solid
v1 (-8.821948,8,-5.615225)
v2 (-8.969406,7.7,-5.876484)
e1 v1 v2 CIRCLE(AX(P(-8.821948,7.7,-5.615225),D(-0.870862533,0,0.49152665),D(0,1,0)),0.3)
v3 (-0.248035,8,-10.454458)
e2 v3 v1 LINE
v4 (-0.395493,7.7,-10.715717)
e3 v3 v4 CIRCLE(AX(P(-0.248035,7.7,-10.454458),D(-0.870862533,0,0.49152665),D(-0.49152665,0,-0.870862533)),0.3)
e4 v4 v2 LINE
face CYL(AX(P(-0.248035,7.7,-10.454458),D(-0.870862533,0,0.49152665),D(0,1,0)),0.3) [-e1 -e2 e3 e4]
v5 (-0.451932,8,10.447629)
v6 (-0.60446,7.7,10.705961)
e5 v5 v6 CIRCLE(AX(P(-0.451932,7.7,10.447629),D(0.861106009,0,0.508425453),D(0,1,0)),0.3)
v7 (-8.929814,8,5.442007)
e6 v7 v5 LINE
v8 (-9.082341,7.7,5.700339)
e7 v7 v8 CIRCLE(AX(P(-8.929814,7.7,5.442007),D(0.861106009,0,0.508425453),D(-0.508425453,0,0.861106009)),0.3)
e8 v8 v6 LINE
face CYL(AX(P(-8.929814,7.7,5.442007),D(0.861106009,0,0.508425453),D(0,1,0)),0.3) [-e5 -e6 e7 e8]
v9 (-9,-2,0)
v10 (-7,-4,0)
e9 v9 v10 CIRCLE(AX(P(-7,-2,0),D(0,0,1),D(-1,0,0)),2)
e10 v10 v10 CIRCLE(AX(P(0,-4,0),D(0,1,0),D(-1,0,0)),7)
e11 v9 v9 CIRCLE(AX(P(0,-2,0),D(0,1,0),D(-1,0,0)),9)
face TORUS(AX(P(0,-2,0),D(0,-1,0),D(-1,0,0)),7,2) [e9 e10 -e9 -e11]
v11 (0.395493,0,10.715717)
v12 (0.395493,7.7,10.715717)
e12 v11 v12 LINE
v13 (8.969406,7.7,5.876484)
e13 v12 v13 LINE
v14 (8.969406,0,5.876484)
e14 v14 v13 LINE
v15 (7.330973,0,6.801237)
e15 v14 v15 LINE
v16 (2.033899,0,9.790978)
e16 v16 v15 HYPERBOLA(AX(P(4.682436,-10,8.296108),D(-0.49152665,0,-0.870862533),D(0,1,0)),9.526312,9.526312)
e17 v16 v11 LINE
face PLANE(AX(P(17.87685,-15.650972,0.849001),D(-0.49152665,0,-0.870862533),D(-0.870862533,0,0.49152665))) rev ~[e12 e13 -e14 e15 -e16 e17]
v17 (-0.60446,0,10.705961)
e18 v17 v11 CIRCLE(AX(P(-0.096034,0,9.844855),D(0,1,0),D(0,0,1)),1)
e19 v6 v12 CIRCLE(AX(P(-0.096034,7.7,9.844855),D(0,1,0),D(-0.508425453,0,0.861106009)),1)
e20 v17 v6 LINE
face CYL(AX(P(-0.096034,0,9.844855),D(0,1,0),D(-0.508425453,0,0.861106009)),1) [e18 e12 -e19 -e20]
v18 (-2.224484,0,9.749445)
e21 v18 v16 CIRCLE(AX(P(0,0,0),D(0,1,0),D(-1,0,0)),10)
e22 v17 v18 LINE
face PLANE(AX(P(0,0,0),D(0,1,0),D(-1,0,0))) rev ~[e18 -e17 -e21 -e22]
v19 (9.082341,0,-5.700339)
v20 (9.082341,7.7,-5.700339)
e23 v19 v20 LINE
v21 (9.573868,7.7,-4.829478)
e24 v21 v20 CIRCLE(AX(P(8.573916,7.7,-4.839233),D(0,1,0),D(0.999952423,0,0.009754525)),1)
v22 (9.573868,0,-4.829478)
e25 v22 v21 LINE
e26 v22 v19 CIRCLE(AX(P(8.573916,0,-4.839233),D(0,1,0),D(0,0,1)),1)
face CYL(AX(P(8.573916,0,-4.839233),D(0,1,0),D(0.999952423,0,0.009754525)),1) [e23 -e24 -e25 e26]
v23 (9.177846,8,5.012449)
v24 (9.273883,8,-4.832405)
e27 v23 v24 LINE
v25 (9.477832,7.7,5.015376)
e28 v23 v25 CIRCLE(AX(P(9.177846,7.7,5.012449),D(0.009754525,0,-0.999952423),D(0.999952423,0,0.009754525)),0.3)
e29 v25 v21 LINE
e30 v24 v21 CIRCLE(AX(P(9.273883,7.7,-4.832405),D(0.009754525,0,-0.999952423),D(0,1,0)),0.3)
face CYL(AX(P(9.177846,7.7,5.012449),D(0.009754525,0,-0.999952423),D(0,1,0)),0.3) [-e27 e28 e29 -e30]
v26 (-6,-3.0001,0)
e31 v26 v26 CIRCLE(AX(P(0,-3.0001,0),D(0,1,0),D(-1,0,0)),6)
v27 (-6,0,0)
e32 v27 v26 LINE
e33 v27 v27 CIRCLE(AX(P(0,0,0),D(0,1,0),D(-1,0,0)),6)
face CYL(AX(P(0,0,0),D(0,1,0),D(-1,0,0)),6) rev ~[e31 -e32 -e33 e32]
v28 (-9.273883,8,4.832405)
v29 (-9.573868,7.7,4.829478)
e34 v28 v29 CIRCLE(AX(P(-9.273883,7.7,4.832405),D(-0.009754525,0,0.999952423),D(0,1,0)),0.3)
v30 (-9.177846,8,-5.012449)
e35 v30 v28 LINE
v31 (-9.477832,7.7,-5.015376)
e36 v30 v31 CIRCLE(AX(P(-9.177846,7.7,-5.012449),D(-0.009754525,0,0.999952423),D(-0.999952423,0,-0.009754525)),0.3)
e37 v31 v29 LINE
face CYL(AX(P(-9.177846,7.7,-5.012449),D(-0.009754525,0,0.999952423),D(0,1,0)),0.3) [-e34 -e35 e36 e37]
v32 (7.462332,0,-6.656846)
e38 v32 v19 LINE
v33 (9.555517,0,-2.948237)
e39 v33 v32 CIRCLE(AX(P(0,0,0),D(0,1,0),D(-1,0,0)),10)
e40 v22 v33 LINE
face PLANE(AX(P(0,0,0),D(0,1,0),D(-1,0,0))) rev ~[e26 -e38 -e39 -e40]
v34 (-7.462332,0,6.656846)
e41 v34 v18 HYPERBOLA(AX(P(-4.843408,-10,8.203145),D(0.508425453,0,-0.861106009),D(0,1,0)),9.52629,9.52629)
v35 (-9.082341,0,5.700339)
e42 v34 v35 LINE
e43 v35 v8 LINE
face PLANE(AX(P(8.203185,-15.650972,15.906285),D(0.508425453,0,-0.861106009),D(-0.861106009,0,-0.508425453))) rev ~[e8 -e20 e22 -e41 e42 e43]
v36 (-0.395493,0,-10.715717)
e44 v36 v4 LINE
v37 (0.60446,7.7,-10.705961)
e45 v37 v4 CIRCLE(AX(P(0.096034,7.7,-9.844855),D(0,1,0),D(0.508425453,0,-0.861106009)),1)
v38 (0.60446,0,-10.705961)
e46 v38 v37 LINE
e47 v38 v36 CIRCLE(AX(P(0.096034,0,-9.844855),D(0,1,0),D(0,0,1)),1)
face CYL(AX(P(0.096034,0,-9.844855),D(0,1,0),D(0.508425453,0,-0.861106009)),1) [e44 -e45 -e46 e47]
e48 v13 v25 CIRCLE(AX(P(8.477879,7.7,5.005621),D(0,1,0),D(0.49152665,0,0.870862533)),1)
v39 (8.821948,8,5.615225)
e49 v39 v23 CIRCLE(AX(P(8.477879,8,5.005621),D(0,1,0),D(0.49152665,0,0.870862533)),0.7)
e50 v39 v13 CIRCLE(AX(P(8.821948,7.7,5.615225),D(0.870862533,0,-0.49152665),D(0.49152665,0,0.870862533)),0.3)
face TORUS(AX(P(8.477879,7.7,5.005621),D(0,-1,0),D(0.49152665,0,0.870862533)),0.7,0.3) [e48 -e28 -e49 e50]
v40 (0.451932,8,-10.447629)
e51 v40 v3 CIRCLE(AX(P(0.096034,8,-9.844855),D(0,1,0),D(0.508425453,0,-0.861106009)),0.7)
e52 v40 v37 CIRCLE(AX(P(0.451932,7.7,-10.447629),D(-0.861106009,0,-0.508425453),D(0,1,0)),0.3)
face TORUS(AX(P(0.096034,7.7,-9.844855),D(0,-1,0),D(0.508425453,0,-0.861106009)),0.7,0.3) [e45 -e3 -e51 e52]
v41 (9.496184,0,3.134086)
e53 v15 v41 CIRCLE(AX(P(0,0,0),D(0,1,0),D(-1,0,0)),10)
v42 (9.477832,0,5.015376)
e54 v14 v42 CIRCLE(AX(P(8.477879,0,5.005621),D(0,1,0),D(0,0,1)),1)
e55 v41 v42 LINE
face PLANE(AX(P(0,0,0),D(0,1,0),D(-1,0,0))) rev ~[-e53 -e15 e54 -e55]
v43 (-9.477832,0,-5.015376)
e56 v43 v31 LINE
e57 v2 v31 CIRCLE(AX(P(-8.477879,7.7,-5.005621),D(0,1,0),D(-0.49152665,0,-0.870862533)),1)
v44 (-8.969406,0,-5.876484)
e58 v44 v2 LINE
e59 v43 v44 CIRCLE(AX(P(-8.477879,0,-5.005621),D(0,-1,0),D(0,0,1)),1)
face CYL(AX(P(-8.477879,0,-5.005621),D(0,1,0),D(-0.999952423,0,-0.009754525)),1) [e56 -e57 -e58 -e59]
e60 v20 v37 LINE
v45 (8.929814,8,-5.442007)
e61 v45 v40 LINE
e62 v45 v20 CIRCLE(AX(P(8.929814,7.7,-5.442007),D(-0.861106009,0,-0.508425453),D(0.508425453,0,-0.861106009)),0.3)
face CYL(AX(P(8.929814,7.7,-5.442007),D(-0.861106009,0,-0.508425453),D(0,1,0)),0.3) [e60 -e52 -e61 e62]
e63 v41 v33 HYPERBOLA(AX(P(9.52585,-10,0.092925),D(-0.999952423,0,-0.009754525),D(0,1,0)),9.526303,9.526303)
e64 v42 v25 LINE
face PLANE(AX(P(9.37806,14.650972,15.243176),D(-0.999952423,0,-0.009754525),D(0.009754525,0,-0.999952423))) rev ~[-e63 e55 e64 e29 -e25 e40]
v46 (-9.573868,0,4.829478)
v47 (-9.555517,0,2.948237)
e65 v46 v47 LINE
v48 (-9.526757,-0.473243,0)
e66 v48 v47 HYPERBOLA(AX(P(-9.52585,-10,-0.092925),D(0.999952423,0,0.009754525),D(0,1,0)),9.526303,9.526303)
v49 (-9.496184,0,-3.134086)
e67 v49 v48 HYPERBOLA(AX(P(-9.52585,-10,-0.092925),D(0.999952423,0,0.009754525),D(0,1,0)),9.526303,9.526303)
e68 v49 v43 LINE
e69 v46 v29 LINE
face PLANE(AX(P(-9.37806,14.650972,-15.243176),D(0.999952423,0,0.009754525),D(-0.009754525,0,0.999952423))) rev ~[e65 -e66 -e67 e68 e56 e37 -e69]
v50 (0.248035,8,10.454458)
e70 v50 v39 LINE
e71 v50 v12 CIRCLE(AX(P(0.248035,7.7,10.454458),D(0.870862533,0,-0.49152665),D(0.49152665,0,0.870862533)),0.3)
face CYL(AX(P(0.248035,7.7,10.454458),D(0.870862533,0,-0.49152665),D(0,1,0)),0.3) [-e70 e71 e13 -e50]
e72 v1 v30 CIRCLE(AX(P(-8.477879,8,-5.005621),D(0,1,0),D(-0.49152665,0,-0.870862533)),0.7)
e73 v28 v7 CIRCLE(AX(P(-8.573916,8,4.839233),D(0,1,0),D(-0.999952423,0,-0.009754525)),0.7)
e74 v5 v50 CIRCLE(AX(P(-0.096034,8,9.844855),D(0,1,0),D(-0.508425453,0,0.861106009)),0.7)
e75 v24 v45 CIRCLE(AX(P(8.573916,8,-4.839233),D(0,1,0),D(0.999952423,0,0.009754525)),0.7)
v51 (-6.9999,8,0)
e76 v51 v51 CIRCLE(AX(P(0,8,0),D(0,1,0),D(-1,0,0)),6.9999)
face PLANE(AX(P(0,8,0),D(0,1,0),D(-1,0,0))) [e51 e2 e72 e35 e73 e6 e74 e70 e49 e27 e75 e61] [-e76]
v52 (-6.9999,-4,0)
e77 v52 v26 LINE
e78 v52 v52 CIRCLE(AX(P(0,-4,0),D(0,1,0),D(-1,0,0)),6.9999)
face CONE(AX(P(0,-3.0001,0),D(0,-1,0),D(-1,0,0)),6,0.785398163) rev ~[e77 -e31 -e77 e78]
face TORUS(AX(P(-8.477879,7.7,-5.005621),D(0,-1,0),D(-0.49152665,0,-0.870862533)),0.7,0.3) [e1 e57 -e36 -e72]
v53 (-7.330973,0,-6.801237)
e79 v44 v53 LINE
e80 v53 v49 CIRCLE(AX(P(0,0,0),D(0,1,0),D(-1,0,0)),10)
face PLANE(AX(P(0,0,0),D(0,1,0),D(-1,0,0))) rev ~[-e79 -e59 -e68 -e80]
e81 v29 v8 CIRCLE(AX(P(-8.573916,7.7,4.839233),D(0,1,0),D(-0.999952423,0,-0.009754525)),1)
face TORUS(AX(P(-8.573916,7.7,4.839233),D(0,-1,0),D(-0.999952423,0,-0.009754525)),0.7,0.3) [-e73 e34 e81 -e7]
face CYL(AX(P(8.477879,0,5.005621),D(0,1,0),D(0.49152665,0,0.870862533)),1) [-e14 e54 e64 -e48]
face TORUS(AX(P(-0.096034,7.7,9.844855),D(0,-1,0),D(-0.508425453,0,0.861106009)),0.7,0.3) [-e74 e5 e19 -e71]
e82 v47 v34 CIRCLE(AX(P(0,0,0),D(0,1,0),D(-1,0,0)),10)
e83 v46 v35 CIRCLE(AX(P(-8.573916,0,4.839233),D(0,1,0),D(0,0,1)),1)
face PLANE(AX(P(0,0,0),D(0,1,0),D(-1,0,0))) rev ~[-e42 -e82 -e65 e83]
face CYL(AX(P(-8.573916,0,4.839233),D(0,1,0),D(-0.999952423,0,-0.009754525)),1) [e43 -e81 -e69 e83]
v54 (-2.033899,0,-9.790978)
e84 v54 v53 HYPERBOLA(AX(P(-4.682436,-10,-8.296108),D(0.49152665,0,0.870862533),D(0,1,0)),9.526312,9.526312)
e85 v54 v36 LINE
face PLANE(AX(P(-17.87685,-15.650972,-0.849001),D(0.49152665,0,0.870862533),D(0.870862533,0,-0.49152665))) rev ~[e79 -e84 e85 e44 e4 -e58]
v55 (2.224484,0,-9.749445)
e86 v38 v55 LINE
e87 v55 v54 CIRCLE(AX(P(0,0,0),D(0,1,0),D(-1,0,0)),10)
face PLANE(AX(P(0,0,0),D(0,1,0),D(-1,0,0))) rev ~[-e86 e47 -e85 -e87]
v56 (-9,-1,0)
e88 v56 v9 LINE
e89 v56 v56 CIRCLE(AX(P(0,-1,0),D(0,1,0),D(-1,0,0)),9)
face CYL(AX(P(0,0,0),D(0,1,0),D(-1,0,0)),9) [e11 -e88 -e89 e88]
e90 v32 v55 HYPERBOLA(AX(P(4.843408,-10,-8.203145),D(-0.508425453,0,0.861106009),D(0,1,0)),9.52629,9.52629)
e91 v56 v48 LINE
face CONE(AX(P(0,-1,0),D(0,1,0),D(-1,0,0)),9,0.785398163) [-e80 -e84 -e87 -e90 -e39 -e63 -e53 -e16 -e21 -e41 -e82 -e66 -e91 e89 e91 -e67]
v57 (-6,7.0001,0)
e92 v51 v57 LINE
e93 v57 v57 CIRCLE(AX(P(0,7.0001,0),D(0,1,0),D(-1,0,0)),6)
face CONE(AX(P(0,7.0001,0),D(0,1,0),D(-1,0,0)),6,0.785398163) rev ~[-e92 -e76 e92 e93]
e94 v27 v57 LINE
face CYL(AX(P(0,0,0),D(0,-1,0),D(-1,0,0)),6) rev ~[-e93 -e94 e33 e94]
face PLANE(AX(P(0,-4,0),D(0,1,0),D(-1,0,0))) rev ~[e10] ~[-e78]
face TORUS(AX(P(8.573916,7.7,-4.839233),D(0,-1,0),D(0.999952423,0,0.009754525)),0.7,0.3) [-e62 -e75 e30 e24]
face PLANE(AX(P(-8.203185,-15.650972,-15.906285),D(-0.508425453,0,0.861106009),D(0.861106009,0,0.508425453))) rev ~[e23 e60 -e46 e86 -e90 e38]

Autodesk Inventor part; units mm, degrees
ref_plane "YZ Plane" through (0, 0, 0) normal (1, 0, 0) x (0, 1, 0)
ref_plane "XZ Plane" through (0, 0, 0) normal (0, 1, 0) x (-1, 0, 0)
ref_plane "XY Plane" through (0, 0, 0) normal (0, 0, 1) x (1, 0, 0)
sketch "Sketch1" plane through (0, 0, 0) normal (0, 1, 0) x (-1, 0, 0)
  line L0 (9.5795, 5.4068) -> (9.4722, -5.5927)
  line L1 (9.4722, -5.5927) -> (-0.1073, -10.9995)
  line L2 (-0.1073, -10.9995) -> (-9.5795, -5.4068)
  line L3 (-9.5795, -5.4068) -> (-9.4722, 5.5927)
  line L4 (-9.4722, 5.5927) -> (0.1073, 10.9995)
  line L5 (0.1073, 10.9995) -> (9.5795, 5.4068)
  circle A0 centre (0, 0) radius 6
  circle A1 centre (0, 0) radius 9
  dimension "d0" = 11
  dimension "d1" = 12
  dimension "d8" = 18
extrude "Extrusion1" add sketch "Sketch1" along normal blind 8 contours L0 L1 L2 L3 L4 L5 | A1
extrude "Extrusion2" add sketch "Sketch1" against normal blind 4 contours A1
fillet "Fillet1" radius 2 1 edges at (9, -4, 0)
chamfer "Chamfer1" distance 1 angle 45 1 edges at (9, 0, 0)
thread "Thread1" size "M12x1.75" class "6H" standard "ANSI Metric M Profile" full length
chamfer "Chamfer2" distance 1 angle 45 2 edges at (6, -4, 0) (6, 8, 0)
fillet "Fillet3" radius 1 6 edges at (-9.5795, 4, 5.4068) (-9.4722, 4, -5.5927) (0.1073, 4, -10.9995) (-0.1073, 4, 10.9995) (9.4722, 4, 5.5927) (9.5795, 4, -5.4068)
fillet "Fillet4" radius 0.3 12 edges at (9.339, 8, 5.514) (9.5258, 8, 0.0929) (9.4448, 8, -5.3308) (4.8434, 8, -8.2031) (0.1058, 8, -10.8448) (-4.6824, 8, -8.2961) (-9.339, 8, -5.514) (-9.5258, 8, -0.0929) (-9.4448, 8, 5.3308) (-4.8434, 8, 8.2031) (-0.1058, 8, 10.8448) (4.6824, 8, 8.2961)
properties part number "SpanoloAnya"
